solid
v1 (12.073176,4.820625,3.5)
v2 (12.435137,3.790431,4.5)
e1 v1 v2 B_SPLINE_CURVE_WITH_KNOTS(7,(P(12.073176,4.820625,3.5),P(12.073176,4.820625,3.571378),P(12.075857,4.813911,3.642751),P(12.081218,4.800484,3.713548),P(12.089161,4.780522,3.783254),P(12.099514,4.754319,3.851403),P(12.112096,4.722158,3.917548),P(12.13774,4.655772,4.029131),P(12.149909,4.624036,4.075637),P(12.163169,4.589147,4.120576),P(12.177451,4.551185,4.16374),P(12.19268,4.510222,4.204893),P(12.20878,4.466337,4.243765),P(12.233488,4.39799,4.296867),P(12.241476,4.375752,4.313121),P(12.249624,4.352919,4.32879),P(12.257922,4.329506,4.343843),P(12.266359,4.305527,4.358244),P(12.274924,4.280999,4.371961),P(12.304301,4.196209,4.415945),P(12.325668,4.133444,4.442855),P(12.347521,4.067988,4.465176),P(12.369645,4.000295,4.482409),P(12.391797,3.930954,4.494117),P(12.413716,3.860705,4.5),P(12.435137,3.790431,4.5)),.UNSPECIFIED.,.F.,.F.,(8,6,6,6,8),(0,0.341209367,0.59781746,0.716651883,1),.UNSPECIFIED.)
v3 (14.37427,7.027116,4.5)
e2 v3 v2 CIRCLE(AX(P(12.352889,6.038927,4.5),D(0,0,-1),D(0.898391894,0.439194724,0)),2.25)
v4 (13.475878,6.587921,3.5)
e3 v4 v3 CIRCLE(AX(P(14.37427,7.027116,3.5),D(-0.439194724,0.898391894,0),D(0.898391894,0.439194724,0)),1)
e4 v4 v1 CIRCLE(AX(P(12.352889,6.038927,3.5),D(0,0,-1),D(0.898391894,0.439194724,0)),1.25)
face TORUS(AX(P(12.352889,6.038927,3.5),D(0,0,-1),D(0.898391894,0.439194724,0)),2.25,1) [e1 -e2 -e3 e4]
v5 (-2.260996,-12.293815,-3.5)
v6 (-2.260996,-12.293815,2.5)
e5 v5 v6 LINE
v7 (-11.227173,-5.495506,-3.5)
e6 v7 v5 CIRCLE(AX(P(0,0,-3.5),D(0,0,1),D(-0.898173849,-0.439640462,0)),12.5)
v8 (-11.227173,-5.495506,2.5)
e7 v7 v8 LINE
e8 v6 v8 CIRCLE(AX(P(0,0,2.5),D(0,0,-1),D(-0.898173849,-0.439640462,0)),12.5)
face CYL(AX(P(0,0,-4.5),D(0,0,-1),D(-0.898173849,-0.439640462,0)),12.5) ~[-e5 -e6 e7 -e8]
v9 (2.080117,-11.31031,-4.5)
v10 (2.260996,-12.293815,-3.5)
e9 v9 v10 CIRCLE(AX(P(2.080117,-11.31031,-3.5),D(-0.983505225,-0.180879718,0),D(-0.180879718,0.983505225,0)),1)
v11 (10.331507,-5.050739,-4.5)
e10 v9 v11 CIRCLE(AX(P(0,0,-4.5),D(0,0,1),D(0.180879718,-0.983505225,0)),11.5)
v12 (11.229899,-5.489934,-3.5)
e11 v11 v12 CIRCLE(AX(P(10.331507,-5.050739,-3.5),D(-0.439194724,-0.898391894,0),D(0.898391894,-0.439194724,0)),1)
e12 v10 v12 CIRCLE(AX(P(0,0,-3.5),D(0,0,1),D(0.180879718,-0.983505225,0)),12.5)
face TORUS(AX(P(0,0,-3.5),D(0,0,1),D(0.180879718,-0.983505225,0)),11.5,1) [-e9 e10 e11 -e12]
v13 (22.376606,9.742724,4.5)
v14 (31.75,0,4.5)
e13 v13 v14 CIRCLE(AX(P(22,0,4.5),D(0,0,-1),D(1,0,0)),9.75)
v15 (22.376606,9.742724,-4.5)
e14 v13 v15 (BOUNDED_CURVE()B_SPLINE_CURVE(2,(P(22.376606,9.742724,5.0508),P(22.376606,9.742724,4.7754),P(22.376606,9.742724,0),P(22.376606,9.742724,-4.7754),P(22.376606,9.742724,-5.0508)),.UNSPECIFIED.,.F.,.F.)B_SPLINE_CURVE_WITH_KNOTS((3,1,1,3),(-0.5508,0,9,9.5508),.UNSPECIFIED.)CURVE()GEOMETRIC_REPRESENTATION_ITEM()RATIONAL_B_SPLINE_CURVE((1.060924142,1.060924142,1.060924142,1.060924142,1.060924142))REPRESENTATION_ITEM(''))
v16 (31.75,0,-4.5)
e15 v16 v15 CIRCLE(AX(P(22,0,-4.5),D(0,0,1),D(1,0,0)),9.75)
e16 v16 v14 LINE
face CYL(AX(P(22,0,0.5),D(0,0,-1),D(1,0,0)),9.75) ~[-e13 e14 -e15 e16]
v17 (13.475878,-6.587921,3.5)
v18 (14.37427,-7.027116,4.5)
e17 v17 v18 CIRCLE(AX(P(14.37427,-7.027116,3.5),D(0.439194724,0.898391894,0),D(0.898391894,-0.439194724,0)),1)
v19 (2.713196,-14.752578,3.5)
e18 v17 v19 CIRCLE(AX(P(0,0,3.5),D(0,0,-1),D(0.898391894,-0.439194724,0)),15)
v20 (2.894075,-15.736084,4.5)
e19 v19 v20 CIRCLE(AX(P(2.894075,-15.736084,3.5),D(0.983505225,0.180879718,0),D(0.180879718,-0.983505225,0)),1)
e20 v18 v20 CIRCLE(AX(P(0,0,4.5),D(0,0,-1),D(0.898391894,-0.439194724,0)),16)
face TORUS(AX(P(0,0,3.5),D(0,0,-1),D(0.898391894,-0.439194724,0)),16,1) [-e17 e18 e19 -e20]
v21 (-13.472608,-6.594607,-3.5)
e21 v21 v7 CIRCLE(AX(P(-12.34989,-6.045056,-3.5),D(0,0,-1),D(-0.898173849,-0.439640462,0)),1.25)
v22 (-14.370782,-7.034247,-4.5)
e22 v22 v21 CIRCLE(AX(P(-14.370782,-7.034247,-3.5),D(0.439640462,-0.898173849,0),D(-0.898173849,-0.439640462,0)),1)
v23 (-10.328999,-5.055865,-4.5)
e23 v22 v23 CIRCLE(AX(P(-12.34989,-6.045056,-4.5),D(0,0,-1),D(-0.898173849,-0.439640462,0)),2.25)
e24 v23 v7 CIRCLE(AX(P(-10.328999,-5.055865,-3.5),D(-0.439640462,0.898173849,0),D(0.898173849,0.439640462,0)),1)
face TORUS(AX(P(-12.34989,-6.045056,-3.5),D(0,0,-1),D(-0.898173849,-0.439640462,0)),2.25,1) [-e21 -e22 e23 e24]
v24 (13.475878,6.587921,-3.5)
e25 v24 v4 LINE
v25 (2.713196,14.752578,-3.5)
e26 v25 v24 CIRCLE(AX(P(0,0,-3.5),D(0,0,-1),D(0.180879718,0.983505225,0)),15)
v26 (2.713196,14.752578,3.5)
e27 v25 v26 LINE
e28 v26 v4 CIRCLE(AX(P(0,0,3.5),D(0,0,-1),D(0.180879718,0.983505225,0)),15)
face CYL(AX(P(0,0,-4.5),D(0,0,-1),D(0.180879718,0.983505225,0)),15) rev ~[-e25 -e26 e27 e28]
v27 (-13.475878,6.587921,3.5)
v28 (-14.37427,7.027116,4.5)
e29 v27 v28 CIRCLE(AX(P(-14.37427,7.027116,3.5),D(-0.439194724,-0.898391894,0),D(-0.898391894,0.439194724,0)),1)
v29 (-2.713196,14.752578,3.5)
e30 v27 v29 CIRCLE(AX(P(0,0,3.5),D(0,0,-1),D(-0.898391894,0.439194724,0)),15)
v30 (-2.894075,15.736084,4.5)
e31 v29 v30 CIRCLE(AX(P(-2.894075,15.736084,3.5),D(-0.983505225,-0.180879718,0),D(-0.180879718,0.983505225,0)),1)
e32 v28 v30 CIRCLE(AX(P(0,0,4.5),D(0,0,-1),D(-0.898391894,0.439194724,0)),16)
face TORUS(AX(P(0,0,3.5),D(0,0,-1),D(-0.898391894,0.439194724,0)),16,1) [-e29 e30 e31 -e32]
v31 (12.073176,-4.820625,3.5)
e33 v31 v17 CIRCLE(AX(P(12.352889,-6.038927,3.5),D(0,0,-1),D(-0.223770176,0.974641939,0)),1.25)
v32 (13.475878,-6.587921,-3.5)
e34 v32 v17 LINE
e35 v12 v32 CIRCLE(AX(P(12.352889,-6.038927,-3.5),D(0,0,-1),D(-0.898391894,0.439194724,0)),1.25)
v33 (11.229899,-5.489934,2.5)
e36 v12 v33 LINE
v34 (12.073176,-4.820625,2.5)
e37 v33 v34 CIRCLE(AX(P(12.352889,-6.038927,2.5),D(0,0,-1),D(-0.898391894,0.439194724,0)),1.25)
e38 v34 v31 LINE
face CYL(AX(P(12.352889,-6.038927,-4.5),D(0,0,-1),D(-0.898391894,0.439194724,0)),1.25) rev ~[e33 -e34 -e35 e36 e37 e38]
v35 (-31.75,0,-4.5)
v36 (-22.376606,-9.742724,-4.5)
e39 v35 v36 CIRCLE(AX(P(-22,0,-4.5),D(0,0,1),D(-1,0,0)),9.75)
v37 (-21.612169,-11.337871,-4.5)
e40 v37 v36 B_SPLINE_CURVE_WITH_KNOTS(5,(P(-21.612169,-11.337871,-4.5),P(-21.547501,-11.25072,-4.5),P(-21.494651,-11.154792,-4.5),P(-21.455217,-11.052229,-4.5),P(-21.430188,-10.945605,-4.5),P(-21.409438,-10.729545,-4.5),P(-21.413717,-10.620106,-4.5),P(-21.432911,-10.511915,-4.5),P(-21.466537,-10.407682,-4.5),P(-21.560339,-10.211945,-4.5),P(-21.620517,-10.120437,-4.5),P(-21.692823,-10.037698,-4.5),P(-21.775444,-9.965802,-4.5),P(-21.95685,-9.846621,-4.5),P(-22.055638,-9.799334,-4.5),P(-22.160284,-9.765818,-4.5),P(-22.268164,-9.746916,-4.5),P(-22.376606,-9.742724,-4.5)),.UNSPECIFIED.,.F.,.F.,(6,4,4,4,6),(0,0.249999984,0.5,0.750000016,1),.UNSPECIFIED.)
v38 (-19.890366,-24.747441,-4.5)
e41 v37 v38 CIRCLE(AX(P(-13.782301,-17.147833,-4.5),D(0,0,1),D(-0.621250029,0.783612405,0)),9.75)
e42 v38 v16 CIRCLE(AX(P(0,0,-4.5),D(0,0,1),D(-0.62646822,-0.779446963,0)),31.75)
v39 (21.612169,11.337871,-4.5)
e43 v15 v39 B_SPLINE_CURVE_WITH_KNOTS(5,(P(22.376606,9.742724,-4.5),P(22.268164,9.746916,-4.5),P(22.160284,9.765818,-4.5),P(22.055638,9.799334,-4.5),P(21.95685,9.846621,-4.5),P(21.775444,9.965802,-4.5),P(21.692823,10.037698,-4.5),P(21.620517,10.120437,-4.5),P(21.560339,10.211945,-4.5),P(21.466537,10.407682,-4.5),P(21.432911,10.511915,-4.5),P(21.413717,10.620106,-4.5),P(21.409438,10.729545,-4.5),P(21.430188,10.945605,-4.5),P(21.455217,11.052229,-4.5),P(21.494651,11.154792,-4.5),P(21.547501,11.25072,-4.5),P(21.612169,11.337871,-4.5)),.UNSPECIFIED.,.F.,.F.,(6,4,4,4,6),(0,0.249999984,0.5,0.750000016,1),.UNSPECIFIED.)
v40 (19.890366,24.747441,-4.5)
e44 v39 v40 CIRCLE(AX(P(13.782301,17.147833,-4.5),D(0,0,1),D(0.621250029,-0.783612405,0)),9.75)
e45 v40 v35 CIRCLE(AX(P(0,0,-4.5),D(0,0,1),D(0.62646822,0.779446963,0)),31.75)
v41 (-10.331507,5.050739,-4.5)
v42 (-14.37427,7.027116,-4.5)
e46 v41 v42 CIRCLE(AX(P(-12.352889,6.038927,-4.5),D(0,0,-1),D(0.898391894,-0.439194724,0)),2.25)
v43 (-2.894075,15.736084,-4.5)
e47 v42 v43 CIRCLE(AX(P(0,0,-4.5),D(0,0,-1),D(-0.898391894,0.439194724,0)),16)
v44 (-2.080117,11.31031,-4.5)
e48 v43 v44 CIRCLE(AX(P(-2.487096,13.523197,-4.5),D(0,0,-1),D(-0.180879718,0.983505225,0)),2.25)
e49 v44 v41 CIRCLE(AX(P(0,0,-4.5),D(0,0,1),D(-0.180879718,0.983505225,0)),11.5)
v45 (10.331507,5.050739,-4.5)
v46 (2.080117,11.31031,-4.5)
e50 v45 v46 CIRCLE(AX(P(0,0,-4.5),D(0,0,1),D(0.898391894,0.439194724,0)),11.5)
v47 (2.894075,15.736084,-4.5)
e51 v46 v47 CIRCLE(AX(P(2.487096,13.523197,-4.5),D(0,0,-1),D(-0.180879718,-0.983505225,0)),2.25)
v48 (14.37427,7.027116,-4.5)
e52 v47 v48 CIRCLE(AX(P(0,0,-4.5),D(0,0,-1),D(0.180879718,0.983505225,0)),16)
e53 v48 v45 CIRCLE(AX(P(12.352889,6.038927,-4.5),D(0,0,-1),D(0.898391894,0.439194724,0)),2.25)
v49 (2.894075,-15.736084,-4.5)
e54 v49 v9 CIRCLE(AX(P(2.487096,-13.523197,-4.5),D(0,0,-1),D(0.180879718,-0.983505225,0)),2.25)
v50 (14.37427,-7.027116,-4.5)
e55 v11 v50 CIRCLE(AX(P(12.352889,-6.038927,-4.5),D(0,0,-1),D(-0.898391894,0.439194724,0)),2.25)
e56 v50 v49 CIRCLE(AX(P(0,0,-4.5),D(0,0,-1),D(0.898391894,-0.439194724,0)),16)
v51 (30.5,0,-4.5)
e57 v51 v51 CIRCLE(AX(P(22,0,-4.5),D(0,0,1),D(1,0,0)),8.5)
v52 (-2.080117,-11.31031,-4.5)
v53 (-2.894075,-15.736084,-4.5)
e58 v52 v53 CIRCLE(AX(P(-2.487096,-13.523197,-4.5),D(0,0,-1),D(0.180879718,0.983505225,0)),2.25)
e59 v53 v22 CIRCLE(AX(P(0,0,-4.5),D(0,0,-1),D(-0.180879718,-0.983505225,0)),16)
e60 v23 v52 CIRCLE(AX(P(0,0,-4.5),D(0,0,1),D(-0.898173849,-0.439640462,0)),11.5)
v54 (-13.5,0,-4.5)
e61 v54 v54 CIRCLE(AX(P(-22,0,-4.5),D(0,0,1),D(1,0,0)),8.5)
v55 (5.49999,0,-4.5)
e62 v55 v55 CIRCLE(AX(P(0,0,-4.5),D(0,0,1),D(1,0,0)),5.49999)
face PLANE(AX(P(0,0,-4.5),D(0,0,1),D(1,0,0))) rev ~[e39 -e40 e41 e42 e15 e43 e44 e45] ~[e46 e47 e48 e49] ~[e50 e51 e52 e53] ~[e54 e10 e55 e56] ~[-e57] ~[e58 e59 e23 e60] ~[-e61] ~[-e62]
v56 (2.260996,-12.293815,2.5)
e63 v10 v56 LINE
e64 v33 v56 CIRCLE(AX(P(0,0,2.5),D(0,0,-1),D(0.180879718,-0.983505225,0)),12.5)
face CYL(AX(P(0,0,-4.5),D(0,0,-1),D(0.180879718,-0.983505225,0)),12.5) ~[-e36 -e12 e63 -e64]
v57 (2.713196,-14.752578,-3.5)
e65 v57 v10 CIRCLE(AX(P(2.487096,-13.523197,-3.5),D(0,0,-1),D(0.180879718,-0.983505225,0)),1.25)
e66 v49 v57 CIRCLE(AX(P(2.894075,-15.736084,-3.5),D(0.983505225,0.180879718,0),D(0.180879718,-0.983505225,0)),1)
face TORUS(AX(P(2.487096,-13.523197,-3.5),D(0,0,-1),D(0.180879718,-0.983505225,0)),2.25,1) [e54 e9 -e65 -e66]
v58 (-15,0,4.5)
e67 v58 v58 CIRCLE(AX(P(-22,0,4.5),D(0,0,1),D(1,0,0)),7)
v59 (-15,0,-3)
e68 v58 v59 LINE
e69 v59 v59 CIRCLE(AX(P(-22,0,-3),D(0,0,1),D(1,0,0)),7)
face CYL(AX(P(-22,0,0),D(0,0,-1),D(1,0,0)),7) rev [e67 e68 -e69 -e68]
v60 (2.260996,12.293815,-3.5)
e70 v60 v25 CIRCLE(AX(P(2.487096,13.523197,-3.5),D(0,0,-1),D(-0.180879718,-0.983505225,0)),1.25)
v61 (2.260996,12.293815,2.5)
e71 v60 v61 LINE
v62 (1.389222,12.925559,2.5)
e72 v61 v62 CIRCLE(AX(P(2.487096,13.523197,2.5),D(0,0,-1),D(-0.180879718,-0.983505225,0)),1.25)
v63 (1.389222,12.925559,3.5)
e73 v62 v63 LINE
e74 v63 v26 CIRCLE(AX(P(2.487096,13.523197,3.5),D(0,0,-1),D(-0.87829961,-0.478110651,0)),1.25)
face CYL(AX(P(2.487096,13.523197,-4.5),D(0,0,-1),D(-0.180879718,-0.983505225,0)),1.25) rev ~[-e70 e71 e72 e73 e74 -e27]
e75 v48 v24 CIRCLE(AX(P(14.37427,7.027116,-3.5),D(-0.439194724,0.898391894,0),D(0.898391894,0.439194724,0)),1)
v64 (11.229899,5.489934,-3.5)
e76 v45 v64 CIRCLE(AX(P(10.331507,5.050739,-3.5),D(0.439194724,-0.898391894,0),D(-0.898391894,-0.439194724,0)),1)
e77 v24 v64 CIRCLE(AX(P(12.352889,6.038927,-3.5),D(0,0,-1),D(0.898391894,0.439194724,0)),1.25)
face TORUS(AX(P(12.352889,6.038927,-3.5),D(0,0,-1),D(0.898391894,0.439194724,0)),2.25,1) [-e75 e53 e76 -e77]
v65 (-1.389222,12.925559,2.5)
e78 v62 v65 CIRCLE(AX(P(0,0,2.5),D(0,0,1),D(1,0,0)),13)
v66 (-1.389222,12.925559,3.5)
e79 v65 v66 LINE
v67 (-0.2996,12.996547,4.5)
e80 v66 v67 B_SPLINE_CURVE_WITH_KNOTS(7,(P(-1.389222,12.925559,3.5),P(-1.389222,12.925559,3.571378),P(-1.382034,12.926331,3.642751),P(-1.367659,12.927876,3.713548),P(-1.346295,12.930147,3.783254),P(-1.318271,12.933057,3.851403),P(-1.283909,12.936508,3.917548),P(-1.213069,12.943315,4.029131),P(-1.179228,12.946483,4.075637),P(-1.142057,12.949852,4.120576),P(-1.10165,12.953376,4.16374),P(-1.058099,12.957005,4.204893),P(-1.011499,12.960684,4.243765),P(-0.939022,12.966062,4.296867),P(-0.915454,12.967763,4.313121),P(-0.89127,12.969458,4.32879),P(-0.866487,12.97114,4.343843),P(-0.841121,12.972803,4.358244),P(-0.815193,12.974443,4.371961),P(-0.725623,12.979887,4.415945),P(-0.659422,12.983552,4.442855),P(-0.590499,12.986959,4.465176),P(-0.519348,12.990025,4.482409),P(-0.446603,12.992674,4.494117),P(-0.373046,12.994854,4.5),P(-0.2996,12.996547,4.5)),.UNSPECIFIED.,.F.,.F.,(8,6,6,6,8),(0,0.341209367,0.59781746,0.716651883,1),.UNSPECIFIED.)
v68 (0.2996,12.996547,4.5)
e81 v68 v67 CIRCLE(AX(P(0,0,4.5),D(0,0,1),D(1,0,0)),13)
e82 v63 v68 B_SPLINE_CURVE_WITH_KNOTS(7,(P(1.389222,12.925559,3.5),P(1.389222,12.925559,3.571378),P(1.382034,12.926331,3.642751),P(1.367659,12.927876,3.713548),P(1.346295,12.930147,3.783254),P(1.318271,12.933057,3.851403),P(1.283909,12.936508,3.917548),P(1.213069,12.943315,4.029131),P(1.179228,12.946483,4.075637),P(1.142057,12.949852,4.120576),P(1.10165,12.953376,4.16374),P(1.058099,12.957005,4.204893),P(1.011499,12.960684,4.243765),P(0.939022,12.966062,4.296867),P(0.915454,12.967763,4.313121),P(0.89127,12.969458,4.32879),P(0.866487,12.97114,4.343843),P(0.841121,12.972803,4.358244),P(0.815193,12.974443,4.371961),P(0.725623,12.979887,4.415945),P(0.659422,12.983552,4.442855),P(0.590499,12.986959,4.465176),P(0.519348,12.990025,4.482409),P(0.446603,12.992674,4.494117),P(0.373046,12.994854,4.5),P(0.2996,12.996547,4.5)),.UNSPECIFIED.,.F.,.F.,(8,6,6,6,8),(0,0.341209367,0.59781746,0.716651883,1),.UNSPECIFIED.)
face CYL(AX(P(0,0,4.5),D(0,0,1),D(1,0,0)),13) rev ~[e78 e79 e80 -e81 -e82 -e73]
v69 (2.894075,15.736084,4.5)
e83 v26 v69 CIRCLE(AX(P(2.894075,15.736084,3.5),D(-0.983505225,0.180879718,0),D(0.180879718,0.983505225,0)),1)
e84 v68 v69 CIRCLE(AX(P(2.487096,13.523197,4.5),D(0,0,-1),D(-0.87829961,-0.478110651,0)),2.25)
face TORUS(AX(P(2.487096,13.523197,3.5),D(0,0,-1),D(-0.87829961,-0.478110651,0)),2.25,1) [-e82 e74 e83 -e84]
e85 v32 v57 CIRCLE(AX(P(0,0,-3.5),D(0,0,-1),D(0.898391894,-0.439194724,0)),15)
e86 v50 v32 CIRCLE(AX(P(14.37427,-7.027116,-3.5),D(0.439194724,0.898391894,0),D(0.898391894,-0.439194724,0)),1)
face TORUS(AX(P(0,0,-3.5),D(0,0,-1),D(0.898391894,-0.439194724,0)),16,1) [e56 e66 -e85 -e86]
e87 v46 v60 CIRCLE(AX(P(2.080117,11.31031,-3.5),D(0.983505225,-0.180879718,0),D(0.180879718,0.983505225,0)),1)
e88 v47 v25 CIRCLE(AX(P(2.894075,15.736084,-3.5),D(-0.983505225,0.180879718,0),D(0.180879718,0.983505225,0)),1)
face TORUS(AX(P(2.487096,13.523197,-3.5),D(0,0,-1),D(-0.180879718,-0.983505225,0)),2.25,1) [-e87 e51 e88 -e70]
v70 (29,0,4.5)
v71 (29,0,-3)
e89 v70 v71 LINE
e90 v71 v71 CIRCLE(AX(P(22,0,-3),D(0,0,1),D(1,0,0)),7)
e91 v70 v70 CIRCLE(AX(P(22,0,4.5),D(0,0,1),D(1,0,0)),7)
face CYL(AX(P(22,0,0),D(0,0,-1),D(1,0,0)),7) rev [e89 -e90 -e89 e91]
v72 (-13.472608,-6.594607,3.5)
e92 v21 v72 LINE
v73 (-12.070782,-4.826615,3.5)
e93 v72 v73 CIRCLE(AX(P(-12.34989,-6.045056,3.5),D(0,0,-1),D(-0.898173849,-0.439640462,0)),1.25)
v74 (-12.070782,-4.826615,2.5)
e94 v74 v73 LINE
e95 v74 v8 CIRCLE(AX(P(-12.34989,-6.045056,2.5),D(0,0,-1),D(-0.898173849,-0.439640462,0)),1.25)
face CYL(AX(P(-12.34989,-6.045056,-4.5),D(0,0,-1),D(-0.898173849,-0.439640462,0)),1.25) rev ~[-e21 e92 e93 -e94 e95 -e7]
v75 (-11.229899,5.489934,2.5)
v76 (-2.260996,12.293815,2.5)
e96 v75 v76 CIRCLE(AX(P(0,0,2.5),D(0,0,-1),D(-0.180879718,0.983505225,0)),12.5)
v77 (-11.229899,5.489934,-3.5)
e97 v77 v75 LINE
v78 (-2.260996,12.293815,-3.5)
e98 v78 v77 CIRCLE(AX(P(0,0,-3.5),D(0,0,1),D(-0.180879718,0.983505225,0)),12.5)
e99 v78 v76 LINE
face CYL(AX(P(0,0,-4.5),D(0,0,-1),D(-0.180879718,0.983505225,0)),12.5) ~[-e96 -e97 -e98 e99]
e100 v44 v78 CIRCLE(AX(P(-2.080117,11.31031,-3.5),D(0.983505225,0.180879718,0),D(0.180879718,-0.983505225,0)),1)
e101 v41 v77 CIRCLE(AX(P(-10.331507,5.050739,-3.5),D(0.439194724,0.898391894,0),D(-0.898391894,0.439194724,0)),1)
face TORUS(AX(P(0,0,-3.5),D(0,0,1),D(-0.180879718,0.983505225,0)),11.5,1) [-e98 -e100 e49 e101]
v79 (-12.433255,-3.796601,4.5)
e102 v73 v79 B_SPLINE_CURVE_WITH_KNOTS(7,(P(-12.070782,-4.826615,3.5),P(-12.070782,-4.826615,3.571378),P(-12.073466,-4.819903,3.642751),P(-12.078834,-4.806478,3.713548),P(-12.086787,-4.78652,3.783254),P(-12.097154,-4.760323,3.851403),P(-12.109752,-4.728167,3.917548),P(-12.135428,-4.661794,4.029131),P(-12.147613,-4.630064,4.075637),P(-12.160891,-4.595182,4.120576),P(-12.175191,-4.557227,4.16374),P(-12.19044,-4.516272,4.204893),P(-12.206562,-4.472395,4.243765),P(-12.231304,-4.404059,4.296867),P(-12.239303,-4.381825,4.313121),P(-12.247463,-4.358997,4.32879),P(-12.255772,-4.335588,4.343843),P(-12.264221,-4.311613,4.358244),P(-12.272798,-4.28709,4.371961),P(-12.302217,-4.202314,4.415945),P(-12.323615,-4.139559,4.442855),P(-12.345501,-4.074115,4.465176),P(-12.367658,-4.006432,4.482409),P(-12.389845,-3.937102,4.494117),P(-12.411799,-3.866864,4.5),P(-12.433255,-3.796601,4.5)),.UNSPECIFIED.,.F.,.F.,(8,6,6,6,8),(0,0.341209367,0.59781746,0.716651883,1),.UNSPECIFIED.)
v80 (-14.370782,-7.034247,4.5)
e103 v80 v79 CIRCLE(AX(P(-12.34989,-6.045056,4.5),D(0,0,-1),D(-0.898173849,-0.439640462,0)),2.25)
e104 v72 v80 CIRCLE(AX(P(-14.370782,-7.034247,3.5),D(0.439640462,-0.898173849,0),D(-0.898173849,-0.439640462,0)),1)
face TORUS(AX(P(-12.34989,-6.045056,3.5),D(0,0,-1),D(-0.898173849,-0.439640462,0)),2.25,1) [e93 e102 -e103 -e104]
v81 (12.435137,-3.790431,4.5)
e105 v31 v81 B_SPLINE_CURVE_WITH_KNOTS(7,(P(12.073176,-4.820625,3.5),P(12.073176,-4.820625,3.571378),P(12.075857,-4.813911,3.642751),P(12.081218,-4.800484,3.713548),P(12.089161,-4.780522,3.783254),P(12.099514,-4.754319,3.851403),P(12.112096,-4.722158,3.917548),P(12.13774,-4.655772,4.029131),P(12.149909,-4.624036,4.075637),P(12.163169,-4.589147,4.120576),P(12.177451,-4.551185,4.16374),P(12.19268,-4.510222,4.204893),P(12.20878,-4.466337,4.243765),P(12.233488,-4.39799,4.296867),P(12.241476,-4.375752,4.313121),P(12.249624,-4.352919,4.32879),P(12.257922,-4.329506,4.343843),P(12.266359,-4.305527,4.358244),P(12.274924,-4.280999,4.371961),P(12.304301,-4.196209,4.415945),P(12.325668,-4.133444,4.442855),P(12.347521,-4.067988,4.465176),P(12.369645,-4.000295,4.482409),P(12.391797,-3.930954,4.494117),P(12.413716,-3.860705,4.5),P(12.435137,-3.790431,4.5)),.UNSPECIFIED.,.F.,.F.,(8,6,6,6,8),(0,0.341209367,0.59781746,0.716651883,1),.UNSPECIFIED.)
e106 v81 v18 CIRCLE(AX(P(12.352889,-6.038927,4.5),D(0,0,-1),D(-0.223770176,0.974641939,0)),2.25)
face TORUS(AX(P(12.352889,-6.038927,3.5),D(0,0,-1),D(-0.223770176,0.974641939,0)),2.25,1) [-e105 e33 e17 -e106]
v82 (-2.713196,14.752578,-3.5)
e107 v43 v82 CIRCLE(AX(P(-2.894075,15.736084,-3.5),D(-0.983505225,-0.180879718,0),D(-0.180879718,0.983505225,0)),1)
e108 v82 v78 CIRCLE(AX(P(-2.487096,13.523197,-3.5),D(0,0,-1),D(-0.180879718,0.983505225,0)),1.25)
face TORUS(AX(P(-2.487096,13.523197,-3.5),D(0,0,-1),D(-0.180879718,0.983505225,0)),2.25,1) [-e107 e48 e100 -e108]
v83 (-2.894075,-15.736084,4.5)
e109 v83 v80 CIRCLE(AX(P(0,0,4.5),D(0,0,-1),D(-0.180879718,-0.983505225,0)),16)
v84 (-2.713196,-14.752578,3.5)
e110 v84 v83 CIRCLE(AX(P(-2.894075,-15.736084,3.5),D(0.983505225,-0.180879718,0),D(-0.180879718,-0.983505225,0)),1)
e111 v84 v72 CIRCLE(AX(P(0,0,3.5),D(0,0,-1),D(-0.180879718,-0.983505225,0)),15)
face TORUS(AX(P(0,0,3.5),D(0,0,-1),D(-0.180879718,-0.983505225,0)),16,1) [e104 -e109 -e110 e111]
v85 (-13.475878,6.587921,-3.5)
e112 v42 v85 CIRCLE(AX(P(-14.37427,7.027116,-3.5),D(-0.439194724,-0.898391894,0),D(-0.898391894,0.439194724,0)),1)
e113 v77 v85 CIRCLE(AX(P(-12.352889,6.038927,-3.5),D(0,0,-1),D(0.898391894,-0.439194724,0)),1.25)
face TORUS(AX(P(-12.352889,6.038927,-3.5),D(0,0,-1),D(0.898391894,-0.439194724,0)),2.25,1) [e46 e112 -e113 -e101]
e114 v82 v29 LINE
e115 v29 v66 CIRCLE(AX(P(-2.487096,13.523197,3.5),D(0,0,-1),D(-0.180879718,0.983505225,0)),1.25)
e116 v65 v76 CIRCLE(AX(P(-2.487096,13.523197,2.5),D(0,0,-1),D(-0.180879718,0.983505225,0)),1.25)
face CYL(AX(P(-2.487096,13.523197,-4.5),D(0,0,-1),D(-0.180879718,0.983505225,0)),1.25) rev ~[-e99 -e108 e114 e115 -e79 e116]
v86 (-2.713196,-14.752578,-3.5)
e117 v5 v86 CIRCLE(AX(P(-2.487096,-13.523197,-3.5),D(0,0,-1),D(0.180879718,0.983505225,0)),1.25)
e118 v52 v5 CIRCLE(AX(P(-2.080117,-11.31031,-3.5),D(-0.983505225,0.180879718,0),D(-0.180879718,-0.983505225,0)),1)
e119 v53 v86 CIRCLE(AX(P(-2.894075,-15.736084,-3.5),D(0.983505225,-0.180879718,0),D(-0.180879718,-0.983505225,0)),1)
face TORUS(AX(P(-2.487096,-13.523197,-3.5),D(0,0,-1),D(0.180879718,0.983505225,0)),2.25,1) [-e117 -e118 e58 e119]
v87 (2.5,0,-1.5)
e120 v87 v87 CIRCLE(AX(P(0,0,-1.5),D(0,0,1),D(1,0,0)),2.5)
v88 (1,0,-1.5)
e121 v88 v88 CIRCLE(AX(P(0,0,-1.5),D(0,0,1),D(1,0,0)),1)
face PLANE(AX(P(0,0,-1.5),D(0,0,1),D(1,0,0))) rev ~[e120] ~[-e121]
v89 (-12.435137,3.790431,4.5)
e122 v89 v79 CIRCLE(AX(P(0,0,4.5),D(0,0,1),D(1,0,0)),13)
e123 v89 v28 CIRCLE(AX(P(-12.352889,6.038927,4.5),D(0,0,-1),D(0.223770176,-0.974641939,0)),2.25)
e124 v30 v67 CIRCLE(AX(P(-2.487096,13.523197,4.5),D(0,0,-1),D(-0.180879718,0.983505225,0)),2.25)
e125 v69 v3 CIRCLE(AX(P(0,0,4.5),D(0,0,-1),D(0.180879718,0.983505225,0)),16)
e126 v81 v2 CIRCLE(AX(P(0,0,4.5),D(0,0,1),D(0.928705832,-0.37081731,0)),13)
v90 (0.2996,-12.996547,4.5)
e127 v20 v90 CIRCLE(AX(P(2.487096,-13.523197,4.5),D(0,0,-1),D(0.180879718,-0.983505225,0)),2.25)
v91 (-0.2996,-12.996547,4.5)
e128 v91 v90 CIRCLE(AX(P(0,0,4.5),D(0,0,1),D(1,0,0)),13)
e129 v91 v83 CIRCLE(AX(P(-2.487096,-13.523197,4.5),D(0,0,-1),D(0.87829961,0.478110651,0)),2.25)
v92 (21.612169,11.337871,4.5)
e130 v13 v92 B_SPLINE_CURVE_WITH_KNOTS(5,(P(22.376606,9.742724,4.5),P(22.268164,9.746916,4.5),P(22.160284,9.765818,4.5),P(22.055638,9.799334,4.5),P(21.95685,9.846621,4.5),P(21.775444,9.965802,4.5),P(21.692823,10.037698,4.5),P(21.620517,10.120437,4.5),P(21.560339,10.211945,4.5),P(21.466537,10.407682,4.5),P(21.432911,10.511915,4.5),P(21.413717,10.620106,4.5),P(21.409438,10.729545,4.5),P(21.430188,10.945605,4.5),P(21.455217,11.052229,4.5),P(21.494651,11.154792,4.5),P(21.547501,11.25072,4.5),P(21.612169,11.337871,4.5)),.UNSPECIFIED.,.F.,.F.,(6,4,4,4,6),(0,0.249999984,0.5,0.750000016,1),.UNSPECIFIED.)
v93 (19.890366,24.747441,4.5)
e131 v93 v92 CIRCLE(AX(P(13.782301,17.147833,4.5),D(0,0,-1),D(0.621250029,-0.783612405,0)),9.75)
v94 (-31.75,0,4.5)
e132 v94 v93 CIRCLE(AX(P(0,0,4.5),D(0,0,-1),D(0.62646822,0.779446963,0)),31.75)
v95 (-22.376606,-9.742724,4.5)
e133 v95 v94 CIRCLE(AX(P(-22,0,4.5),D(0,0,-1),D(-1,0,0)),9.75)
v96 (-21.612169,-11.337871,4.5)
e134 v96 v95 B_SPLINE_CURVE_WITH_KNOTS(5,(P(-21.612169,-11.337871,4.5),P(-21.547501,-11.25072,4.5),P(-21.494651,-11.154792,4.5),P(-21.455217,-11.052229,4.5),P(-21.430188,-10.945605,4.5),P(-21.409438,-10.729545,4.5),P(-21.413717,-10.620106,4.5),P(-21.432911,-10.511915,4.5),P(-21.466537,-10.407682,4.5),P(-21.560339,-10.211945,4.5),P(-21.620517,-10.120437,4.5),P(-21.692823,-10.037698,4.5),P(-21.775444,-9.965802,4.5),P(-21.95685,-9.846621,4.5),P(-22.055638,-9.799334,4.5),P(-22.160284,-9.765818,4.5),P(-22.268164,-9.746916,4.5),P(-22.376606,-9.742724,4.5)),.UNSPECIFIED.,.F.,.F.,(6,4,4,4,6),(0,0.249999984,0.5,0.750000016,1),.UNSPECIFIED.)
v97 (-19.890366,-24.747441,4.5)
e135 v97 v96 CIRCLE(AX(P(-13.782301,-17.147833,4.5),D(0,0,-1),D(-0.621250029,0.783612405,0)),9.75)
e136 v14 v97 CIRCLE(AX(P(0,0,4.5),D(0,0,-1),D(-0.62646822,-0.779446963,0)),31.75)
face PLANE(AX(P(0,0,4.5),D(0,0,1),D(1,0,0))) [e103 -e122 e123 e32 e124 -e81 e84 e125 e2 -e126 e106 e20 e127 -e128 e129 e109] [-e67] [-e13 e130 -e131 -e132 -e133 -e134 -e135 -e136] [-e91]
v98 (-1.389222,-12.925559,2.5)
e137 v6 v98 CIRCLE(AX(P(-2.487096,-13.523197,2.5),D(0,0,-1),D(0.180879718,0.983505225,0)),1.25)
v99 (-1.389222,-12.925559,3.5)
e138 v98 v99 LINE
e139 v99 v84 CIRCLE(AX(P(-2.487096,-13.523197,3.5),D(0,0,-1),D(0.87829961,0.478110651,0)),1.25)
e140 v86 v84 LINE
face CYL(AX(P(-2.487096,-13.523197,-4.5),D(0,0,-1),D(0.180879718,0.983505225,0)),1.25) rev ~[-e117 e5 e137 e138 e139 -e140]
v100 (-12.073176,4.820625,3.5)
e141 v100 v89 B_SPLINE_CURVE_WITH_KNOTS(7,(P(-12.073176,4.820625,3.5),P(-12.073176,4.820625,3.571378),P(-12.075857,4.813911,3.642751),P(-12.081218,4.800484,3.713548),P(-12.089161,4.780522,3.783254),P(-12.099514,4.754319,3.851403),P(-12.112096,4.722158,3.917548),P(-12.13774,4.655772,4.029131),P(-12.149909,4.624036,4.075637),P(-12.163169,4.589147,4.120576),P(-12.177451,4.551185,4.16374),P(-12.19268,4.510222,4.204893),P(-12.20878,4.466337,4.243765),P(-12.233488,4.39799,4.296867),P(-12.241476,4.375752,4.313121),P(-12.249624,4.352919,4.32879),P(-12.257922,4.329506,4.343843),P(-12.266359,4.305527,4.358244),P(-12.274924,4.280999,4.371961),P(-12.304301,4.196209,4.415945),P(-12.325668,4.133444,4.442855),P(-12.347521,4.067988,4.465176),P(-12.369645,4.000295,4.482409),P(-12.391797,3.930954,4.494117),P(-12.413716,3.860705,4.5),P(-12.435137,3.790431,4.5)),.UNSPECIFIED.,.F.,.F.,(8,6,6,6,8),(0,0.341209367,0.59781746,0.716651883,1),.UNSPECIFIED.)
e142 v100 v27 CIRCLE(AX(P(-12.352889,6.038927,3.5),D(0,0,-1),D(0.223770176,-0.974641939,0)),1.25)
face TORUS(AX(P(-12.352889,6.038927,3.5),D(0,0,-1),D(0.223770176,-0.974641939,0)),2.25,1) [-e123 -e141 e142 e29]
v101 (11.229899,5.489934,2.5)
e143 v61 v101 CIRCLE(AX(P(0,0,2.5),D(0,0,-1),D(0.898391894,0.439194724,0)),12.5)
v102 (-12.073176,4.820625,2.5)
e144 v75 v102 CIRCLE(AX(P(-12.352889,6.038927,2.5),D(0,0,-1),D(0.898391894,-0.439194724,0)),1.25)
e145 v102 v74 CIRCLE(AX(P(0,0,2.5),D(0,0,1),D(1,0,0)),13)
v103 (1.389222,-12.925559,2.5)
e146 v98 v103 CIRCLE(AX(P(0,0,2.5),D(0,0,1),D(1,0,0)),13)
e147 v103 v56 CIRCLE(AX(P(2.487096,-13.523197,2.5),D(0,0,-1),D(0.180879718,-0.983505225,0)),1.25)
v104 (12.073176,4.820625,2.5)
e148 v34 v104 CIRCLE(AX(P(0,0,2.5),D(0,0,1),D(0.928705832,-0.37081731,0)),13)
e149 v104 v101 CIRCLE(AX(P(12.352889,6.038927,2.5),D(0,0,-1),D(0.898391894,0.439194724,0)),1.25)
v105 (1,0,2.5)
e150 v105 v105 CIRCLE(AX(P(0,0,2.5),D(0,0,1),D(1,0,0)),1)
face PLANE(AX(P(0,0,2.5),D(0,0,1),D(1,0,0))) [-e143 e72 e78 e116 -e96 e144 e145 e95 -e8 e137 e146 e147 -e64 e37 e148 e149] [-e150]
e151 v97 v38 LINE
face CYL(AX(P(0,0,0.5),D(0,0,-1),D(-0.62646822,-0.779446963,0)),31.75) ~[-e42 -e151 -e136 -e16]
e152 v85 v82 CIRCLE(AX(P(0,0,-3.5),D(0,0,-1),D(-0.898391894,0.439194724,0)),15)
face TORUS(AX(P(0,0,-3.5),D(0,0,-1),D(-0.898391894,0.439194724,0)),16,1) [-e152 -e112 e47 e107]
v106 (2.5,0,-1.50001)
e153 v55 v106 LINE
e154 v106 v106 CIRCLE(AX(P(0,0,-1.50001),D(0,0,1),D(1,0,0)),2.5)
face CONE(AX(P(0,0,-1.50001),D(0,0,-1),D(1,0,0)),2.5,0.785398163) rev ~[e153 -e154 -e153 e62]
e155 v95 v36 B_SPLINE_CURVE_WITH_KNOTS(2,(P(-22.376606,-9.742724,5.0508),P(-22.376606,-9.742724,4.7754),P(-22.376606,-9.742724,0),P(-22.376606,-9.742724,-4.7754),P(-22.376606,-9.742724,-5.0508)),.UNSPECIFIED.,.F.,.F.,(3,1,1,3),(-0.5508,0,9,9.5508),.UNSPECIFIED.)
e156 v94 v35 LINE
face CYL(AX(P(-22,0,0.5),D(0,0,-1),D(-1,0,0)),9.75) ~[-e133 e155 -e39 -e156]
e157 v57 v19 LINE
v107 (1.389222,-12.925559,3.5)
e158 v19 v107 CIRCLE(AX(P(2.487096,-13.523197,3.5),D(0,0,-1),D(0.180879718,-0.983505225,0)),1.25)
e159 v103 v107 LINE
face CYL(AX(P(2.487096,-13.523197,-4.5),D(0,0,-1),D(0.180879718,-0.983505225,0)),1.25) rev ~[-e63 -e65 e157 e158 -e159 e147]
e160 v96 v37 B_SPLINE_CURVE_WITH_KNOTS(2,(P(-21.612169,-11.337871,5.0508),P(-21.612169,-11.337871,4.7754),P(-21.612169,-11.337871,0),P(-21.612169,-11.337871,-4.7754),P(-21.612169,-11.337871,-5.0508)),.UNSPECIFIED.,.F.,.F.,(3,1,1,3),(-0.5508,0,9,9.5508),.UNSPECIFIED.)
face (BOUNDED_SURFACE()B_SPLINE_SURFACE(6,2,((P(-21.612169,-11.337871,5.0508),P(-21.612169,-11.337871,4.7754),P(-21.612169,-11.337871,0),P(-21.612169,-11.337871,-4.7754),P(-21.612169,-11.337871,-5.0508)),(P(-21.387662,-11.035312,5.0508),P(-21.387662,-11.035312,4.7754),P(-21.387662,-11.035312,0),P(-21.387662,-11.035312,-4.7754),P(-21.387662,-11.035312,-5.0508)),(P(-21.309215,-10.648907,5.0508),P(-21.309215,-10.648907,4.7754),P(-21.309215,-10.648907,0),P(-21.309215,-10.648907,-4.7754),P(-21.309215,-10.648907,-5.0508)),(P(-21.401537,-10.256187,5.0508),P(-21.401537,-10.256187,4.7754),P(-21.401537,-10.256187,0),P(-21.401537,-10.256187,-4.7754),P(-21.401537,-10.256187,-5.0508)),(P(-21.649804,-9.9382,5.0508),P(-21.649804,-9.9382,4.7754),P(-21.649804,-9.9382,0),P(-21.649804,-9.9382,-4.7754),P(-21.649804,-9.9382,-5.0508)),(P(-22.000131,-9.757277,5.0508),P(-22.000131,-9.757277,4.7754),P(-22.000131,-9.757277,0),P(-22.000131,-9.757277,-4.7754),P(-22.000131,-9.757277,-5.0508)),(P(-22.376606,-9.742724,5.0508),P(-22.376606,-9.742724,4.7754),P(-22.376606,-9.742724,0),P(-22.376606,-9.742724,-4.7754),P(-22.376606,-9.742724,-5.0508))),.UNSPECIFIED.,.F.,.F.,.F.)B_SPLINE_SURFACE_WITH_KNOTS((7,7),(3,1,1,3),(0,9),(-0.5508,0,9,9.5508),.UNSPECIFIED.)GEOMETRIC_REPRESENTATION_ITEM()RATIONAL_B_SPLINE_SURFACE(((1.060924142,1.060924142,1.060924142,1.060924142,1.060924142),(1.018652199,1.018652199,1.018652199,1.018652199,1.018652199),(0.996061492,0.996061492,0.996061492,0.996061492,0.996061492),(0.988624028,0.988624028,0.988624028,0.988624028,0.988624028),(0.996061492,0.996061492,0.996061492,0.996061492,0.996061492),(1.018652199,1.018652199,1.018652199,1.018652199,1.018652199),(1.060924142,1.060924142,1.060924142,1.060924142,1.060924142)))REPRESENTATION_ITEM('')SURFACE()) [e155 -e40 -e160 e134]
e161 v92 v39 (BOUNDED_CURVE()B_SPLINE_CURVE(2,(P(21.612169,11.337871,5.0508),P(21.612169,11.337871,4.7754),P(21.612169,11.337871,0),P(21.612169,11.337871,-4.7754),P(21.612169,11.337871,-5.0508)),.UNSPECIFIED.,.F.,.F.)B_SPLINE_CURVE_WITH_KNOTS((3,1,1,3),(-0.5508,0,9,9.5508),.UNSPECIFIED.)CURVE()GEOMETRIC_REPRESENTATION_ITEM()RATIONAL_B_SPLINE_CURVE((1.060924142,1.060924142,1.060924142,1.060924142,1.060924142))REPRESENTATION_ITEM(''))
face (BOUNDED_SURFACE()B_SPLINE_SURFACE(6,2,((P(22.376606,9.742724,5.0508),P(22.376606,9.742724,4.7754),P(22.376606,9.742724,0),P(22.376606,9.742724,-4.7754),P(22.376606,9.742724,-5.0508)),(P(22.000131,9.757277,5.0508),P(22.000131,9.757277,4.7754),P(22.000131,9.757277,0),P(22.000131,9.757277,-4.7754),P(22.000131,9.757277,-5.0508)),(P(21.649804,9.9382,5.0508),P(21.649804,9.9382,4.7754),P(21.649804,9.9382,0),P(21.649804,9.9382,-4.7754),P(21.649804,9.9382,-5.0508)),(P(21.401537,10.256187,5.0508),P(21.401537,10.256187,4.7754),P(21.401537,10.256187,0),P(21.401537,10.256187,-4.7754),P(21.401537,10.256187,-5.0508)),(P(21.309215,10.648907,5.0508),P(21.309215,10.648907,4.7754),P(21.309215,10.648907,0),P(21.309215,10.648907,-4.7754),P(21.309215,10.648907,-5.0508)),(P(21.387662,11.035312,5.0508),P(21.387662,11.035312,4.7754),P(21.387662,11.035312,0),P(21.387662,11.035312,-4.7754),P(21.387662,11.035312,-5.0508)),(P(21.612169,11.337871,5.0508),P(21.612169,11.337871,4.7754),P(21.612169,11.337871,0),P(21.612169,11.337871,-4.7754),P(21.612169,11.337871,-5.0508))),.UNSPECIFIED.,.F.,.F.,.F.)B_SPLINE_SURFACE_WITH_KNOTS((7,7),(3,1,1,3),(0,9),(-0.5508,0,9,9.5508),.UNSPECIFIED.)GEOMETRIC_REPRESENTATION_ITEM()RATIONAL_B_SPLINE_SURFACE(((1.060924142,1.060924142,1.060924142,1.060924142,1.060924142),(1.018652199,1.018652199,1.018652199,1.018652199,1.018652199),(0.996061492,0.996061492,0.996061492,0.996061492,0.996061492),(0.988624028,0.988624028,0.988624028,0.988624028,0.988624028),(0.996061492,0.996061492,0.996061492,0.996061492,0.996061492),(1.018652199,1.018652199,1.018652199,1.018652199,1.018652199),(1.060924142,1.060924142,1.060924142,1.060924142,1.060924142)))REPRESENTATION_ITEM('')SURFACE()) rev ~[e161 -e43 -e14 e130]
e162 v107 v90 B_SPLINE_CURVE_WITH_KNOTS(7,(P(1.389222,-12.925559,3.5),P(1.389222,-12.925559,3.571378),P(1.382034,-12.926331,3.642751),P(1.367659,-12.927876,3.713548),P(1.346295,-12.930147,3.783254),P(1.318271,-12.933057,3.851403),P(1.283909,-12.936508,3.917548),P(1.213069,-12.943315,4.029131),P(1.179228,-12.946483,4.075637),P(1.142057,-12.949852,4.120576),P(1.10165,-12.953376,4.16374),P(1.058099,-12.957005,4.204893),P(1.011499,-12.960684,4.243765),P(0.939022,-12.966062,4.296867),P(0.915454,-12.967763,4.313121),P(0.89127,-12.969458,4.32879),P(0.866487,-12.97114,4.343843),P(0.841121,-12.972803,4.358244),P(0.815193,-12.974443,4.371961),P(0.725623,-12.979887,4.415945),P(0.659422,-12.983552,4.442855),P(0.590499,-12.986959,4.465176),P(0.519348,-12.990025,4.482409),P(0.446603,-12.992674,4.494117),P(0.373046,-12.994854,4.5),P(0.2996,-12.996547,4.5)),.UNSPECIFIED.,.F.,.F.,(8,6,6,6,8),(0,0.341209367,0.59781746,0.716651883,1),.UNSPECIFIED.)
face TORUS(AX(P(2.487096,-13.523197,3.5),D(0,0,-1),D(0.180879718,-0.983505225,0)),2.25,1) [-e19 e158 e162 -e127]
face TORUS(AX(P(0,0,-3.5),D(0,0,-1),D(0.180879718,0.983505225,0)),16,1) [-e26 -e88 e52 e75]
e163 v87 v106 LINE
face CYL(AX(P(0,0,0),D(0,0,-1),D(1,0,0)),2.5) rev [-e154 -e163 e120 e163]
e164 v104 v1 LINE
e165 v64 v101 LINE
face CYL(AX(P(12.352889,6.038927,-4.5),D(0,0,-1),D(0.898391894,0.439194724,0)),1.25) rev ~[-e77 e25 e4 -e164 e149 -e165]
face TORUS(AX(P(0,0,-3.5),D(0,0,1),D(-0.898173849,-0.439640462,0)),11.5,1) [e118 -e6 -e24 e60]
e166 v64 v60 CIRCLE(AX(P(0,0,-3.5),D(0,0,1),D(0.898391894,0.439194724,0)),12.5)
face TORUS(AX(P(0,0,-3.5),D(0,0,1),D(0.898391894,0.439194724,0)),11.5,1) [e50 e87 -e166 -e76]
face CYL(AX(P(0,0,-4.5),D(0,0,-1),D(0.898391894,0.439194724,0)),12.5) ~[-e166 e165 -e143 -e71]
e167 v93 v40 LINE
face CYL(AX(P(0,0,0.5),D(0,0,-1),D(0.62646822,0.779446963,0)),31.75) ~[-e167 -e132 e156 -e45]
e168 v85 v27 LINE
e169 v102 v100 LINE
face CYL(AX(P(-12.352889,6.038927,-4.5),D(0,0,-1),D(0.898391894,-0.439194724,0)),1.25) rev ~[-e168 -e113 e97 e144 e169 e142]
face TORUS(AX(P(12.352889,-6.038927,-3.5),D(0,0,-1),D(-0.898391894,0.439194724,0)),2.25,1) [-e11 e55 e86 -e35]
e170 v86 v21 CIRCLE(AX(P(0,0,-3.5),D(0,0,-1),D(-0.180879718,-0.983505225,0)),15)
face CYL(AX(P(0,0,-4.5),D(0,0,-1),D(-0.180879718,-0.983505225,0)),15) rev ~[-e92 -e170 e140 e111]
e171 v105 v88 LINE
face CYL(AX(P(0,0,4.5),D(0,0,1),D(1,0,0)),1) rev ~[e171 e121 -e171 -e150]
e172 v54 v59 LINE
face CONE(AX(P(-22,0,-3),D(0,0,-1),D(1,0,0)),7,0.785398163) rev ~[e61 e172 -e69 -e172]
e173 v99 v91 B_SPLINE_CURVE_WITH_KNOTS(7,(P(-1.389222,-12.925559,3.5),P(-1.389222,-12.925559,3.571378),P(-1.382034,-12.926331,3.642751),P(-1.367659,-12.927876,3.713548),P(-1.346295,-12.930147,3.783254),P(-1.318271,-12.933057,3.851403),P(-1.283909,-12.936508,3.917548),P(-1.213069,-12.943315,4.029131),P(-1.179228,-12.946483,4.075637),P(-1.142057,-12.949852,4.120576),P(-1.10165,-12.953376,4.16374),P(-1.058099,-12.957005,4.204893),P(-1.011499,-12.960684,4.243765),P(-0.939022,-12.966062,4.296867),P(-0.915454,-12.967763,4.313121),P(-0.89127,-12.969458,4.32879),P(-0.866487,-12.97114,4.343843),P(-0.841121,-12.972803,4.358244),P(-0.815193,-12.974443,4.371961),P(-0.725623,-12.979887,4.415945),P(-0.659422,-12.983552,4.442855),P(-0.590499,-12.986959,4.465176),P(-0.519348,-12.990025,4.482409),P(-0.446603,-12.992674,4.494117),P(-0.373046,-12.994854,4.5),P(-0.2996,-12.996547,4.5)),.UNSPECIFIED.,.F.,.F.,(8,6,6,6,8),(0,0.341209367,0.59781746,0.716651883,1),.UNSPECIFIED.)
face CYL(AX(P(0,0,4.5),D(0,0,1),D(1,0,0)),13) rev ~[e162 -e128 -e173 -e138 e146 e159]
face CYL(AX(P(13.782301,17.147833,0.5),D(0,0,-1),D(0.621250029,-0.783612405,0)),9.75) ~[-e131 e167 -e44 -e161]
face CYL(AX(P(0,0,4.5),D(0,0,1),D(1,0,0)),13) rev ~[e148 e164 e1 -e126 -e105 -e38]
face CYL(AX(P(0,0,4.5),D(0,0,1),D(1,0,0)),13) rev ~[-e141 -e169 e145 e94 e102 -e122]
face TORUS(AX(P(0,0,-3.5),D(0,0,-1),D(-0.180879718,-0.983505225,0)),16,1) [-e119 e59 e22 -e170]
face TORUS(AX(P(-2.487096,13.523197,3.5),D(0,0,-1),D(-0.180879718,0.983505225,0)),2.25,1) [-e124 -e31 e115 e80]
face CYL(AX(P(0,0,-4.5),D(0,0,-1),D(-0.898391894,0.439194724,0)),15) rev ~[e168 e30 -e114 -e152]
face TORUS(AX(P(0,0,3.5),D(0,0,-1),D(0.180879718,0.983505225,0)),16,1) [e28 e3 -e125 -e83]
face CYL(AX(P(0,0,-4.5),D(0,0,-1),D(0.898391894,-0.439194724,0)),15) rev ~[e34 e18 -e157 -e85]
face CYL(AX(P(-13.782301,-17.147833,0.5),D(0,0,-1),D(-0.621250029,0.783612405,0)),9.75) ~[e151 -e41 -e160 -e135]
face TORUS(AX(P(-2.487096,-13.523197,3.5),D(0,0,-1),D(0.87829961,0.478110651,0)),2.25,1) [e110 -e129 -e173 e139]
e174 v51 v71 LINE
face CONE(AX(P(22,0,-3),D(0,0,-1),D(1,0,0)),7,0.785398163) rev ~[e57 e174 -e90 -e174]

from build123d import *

# Parameters (mm, degrees)
F0_R      = 32.5
F0_R_2    = 7
F0_R_3    = 2.5
F1_DEPTH  = 4.5
F2_R      = 2.5
F2_R_2    = 1
F3_DEPTH  = 6
F4_R      = 32.5
F5_DEPTH  = 5
F6_R      = 13
F7_DEPTH  = 2
F8_DEPTH  = 2
F9_R      = 32.5
F10_DEPTH = 4.001
F12_DEPTH = 9.001
F13_SIZE  = 1.5
F14_R     = 1
F15_R     = 1
F16_SIZE2 = 2.99999
F16_SIZE  = 2.99999


# Not quite as in the source:
# - a fillet or chamfer is up to 0.001 mm smaller than in the source, because OpenCascade refuses the exact size
# - a feature names something its author has since deleted; it is built from what else it names


with BuildPart() as f1:
    # F0 (on Top) → F1 (new body, symmetric)
    with BuildSketch(Plane.XY):
        Circle(F0_R)
        with Locations((-22, 0)):
            Circle(F0_R_2, mode=Mode.SUBTRACT)
        Circle(F0_R_3, mode=Mode.SUBTRACT)
        with Locations((22, 0)):
            Circle(F0_R_2, mode=Mode.SUBTRACT)
    extrude(amount=F1_DEPTH, both=True)

    # F2 (on face) → F3 (join)
    with BuildSketch(Plane.XY.offset(4.5)):
        Circle(F2_R)
        Circle(F2_R_2, mode=Mode.SUBTRACT)
    extrude(amount=-F3_DEPTH)

    # F4 (on face) → F5 (cut)
    with BuildSketch(Plane(origin=(0, 0, -4.5), x_dir=(1, 0, 0), z_dir=(0, 0, -1))):
        Circle(F4_R)
        with BuildLine():
            ThreePointArc((31.75, 0), (28.0826603639, -7.6199568829), (19.8394886364, -9.5076122474))
            ThreePointArc((19.8394886364, -9.5076122474), (23.5322465177, -17.1152835163), (19.8903659997, -24.7474410878))
            ThreePointArc((19.8903659997, -24.7474410878), (-13.7212131298, -28.631989282), (-31.75, 0))
            ThreePointArc((-31.75, 0), (-28.0826603639, 7.6199568829), (-19.8394886364, 9.5076122474))
            ThreePointArc((-19.8394886364, 9.5076122474), (-23.5322465177, 17.1152835163), (-19.8903659997, 24.7474410878))
            ThreePointArc((-19.8903659997, 24.7474410878), (13.7212131298, 28.631989282), (31.75, 0))
        make_face(mode=Mode.SUBTRACT)
    extrude(amount=-F5_DEPTH, mode=Mode.SUBTRACT)

    # F6 (on face) → F7 (cut)
    with BuildSketch(Plane.XY.offset(4.5)):
        Circle(F6_R)
    extrude(amount=-F7_DEPTH, mode=Mode.SUBTRACT)

    # F6 (on face) → F8 (cut)
    with BuildSketch(Plane.XY.offset(4.5)):
        Circle(F6_R)
    extrude(amount=-F8_DEPTH, mode=Mode.SUBTRACT)

    # F9 (on face) → F10 (cut, through all)
    with BuildSketch(Plane(origin=(0, 0, 0.5), x_dir=(1, 0, 0), z_dir=(0, 0, -1))):
        Circle(F9_R)
        with BuildLine():
            ThreePointArc((31.75, 0), (28.0826603639, -7.6199568829), (19.8394886364, -9.5076122474))
            ThreePointArc((19.8394886364, -9.5076122474), (23.5322465177, -17.1152835163), (19.8903659997, -24.7474410878))
            ThreePointArc((19.8903659997, -24.7474410878), (-13.7212131298, -28.631989282), (-31.75, 0))
            ThreePointArc((-31.75, 0), (-28.0826603639, 7.6199568829), (-19.8394886364, 9.5076122474))
            ThreePointArc((-19.8394886364, 9.5076122474), (-23.5322465177, 17.1152835163), (-19.8903659997, 24.7474410878))
            ThreePointArc((-19.8903659997, 24.7474410878), (13.7212131298, 28.631989282), (31.75, 0))
        make_face(mode=Mode.SUBTRACT)
    extrude(amount=-F10_DEPTH, mode=Mode.SUBTRACT)

    # F11 (on face) → F12 (cut, through all)
    with BuildSketch(Plane(origin=(0, 0, -4.5), x_dir=(1, 0, 0), z_dir=(0, 0, -1))):
        with BuildLine():
            ThreePointArc((2.2609964719, -12.2938153132), (1.2577145878, -13.7492964917), (2.7131957663, -14.7525783758))
            ThreePointArc((2.7131957663, -14.7525783758), (9.0657012248, -11.9504418873), (13.4758784029, -6.587920861))
            ThreePointArc((13.4758784029, -6.587920861), (12.9018819411, -4.915937589), (11.2298986691, -5.4899340508))
            ThreePointArc((11.2298986691, -5.4899340508), (7.5547510207, -9.9587015728), (2.2609964719, -12.2938153132))
        make_face()
        with BuildLine():
            ThreePointArc((2.2609964719, 12.2938153132), (7.5547510207, 9.9587015728), (11.2298986691, 5.4899340508))
            ThreePointArc((11.2298986691, 5.4899340508), (12.9018819411, 4.915937589), (13.4758784029, 6.587920861))
            ThreePointArc((13.4758784029, 6.587920861), (9.0657012248, 11.9504418873), (2.7131957663, 14.7525783758))
            ThreePointArc((2.7131957663, 14.7525783758), (1.2577145878, 13.7492964917), (2.2609964719, 12.2938153132))
        make_face()
        with BuildLine():
            ThreePointArc((-13.4758784029, -6.587920861), (-9.0657012248, -11.9504418873), (-2.7131957663, -14.7525783758))
            ThreePointArc((-2.7131957663, -14.7525783758), (-1.2577145878, -13.7492964917), (-2.2609964719, -12.2938153132))
            ThreePointArc((-2.2609964719, -12.2938153132), (-7.5547510207, -9.9587015728), (-11.2298986691, -5.4899340508))
            ThreePointArc((-11.2298986691, -5.4899340508), (-12.9018819411, -4.915937589), (-13.4758784029, -6.587920861))
        make_face()
        with BuildLine():
            ThreePointArc((-11.2271731179, 5.4955057803), (-7.5522799767, 9.9605756437), (-2.2609964719, 12.2938153132))
            ThreePointArc((-2.2609964719, 12.2938153132), (-1.2577145878, 13.7492964917), (-2.7131957663, 14.7525783758))
            ThreePointArc((-2.7131957663, 14.7525783758), (-9.0627359721, 11.9526907724), (-13.4726077415, 6.5946069363))
            ThreePointArc((-13.4726077415, 6.5946069363), (-12.8994410077, 4.9223390465), (-11.2271731179, 5.4955057803))
        make_face()
    extrude(amount=-F12_DEPTH, mode=Mode.SUBTRACT)

    # F13
    f13_edges = [f1.edges().sort_by_distance(p)[0] for p in [
        (15, 0, -4.5),
        (-29, 0, -4.5),
    ]]
    chamfer(f13_edges, length=F13_SIZE)

    # F14
    f14_edges = [f1.edges().sort_by_distance(p)[0] for p in [
        (-19.839489, -9.507612, 0),
        (19.839489, 9.507612, 0),
    ]]
    fillet(f14_edges, radius=F14_R)

    # F15
    f15_edges = [f1.edges().sort_by_distance(p)[0] for p in [
        (-9.065701, 11.950442, 4.5),
        (-9.062736, -11.952691, 4.5),
        (-9.062736, -11.952691, -4.5),
        (9.065701, -11.950442, 4.5),
        (9.065701, -11.950442, -4.5),
        (9.065701, 11.950442, -4.5),
        (9.065701, 11.950442, 4.5),
        (-9.065701, 11.950442, -4.5),
        (1.474921, -14.256683, 4.5),
        (-1.474921, -14.256683, 4.5),
        (13.331976, -5.261826, 4.5),
        (13.331976, 5.261826, 4.5),
        (1.474921, 14.256683, 4.5),
        (-13.329364, -5.26844, 4.5),
        (-13.331976, 5.261826, 4.5),
        (-1.474921, 14.256683, 4.5),
        (12.901882, -4.915938, -4.5),
        (1.257715, -13.749296, -4.5),
        (-1.257715, -13.749296, -4.5),
        (-12.899441, -4.922339, -4.5),
        (-12.901882, 4.915938, -4.5),
        (-1.257715, 13.749296, -4.5),
        (1.257715, 13.749296, -4.5),
        (12.901882, 4.915938, -4.5),
        (-7.55228, -9.960576, -4.5),
        (7.554751, -9.958702, -4.5),
        (-7.554751, 9.958702, -4.5),
        (7.554751, 9.958702, -4.5),
    ]]
    fillet(f15_edges, radius=F15_R)

    # F16 (size 3 and 3 in the source; OpenCascade refuses exactly that, so slightly less here)
    f16_edges = [f1.edges().sort_by_distance(p)[0] for p in [
        (-2.5, 0, -4.5),
    ]]
    chamfer(f16_edges, length=F16_SIZE, length2=F16_SIZE2)


solid = f1.part
